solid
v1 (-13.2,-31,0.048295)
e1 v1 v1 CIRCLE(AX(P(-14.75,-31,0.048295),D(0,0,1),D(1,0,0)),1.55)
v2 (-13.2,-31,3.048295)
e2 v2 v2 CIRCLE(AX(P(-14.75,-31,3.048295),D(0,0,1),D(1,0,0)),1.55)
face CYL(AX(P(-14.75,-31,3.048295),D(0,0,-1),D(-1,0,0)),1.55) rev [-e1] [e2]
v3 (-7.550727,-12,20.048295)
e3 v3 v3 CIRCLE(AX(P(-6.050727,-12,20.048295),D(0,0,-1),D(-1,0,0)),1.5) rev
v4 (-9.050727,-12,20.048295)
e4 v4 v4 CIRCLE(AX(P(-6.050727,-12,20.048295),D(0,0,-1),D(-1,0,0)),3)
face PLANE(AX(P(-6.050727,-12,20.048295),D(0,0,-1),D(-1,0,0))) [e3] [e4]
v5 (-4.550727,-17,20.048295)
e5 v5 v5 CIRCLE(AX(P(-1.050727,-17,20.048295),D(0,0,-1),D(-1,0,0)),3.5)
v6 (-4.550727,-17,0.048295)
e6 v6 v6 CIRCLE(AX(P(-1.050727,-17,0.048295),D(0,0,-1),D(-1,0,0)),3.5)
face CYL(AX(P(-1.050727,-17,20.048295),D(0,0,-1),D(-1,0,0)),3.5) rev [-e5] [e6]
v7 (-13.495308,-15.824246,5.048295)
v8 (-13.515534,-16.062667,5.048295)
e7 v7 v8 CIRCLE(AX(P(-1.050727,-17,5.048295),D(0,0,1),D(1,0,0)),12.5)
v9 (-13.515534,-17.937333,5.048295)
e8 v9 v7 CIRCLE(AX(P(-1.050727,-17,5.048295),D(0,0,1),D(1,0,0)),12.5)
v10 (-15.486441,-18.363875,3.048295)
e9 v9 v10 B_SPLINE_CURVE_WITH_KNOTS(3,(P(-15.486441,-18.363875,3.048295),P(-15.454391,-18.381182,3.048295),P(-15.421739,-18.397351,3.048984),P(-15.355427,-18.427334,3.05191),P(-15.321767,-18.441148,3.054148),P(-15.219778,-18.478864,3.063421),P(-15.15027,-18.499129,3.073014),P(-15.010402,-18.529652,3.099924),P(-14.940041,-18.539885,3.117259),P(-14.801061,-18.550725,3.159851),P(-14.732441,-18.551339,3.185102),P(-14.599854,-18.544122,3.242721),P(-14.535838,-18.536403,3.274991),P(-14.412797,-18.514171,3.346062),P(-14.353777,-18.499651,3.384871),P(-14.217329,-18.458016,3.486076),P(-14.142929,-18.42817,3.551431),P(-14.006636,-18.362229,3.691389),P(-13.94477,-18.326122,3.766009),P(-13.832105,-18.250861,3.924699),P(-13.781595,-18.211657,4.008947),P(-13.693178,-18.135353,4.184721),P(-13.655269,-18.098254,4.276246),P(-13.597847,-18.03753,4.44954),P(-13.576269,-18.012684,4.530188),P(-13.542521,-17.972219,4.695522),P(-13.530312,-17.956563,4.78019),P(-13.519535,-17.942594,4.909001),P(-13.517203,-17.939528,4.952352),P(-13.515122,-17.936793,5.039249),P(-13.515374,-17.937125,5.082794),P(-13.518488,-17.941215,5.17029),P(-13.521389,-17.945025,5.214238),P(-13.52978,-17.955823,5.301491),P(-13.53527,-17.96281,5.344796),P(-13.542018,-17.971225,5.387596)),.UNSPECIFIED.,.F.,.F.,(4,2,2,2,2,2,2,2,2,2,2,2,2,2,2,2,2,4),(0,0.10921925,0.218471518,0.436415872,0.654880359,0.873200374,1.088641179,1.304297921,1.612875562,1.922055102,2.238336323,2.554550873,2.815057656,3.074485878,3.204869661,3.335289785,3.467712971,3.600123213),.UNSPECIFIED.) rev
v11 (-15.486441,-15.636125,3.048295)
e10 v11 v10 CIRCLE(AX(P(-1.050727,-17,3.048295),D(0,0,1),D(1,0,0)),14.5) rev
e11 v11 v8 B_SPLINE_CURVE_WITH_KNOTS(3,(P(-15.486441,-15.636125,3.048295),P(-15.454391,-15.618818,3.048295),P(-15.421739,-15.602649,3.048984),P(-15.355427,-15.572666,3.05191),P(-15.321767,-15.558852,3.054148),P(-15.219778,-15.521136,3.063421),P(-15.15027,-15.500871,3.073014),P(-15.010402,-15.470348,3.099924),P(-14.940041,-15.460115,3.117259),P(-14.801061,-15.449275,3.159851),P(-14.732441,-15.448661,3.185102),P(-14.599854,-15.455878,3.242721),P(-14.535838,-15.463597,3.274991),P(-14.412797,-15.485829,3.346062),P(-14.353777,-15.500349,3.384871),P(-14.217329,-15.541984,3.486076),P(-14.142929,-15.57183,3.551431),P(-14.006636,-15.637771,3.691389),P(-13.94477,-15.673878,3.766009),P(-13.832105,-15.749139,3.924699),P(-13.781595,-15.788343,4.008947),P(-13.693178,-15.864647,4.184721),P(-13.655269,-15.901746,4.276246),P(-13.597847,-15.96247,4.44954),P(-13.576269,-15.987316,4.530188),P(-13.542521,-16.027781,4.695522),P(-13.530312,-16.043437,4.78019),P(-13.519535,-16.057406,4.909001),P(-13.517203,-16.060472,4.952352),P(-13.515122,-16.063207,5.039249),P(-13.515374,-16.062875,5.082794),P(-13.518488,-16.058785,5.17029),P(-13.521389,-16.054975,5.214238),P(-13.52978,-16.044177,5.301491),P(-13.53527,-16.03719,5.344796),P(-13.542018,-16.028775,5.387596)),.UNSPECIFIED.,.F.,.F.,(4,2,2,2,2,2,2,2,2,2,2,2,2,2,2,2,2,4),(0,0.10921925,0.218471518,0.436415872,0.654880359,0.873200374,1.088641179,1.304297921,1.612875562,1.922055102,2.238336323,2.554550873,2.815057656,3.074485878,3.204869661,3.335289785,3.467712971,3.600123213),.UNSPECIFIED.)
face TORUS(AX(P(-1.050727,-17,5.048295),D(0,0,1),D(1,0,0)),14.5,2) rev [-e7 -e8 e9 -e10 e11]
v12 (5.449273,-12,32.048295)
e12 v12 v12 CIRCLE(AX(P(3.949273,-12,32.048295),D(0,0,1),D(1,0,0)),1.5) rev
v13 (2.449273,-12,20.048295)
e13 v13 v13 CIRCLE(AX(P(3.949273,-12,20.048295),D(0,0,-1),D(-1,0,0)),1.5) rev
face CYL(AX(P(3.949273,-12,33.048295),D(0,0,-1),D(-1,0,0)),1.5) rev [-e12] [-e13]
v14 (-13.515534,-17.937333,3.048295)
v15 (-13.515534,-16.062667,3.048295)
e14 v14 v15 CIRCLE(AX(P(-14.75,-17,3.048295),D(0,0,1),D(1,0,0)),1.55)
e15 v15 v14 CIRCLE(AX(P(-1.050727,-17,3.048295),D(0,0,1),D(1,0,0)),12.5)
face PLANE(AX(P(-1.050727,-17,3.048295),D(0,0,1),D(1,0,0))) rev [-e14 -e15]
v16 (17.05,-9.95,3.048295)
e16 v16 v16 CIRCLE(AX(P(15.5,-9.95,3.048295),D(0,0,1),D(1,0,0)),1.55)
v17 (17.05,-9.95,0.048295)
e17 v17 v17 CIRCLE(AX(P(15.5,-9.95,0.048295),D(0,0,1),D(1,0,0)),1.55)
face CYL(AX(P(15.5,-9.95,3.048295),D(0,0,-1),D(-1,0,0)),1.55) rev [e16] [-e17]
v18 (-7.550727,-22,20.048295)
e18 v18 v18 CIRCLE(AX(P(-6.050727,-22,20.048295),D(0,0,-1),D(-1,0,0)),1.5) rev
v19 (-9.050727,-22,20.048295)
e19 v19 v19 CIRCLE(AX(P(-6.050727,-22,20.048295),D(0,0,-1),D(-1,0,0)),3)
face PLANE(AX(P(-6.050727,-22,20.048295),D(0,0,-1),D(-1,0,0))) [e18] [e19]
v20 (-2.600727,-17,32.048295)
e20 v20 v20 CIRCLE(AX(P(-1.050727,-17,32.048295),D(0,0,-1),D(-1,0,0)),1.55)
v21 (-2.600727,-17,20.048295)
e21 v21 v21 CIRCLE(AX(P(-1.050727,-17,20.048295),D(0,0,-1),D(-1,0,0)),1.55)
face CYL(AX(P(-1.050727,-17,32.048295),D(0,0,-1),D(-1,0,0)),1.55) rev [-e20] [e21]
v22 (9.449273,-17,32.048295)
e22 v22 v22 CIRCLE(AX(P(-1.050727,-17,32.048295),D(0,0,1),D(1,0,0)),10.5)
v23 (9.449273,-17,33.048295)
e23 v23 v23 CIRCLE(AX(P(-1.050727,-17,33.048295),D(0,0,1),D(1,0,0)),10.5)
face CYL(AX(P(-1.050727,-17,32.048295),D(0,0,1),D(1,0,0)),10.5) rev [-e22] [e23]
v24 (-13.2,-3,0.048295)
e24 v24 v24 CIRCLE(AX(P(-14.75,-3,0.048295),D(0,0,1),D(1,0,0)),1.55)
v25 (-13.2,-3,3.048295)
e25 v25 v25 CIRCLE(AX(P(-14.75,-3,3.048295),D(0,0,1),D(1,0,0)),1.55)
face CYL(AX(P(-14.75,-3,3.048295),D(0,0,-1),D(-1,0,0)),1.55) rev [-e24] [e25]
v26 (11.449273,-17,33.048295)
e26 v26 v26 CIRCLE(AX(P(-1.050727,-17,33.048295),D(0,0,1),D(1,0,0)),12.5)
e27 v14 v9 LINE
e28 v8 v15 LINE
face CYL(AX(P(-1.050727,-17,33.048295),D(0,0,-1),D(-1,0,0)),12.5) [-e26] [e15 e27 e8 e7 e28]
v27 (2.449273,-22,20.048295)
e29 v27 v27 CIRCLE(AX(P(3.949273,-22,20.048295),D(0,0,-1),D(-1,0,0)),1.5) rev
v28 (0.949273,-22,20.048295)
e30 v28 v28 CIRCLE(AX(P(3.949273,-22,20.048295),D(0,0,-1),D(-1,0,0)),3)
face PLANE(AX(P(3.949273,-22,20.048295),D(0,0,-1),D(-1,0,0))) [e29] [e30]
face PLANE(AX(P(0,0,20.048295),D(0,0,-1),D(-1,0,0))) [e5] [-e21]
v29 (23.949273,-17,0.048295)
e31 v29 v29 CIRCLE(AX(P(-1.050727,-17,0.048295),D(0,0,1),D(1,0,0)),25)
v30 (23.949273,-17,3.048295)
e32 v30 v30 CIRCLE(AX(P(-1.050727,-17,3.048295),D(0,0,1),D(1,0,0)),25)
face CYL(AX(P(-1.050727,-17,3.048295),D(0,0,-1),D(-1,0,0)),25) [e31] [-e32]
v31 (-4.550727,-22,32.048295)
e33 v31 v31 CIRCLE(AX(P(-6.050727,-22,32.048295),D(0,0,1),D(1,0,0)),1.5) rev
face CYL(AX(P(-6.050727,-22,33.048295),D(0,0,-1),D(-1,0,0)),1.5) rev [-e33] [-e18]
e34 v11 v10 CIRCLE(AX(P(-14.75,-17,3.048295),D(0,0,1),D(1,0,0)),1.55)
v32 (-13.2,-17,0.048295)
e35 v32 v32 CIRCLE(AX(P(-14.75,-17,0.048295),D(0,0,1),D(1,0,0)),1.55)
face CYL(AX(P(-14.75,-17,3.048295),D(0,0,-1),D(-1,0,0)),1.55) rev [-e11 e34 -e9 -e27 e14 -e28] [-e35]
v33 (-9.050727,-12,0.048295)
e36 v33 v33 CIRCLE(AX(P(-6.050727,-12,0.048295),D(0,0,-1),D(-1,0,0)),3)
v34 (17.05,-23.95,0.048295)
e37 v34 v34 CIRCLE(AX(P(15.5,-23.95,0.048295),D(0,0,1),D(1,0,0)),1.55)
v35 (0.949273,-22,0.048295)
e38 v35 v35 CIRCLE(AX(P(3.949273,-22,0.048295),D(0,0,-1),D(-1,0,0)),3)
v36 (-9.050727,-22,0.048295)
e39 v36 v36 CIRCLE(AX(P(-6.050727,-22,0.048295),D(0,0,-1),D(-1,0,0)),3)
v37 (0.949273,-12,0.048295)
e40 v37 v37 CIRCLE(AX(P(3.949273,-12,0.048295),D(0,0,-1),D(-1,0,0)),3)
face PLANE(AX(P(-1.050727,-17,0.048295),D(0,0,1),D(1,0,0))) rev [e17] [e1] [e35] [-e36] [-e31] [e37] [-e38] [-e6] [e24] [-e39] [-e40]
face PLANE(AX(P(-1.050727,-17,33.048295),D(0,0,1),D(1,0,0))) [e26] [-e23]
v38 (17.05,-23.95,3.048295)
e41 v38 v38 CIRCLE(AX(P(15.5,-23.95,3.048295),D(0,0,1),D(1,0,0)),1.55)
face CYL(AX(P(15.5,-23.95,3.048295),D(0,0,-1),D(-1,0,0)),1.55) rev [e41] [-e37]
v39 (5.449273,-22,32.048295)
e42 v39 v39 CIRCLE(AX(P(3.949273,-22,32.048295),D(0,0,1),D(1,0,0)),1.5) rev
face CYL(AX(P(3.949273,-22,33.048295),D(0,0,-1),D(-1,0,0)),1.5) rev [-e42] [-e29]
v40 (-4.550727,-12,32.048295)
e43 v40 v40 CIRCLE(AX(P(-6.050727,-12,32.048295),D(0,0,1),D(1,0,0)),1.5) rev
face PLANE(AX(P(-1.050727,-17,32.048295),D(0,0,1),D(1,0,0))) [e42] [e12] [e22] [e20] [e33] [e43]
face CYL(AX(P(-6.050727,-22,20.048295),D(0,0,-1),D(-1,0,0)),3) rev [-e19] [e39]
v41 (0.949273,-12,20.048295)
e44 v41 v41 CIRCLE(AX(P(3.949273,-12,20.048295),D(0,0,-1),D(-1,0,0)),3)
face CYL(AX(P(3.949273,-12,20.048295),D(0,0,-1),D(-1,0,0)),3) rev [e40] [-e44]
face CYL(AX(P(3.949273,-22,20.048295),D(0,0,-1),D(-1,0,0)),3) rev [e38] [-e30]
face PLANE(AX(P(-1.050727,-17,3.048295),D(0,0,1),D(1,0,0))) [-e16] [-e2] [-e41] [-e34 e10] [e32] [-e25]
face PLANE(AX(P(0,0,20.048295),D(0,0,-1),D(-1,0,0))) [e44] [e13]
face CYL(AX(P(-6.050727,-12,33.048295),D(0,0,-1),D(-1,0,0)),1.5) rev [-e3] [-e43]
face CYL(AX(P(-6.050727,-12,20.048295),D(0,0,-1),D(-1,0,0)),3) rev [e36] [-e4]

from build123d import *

# Parameters (mm, degrees)
SKETCH_2_R          = 25
SKETCH_2_R_2        = 1.55
EXTRUDE_1_DEPTH     = 3
SKETCH_3_R          = 12.5
EXTRUDE_2_DEPTH     = 30
SKETCH_4_R          = 4
CUT_EXTRUDE_1_DEPTH = 18
SKETCH_5_R          = 2.467025672
SKETCH_5_R_2        = 1.5
CUT_EXTRUDE_2_DEPTH = 33
SKETCH_6_R          = 10.5
CUT_EXTRUDE_3_DEPTH = 1
FILLET_1_R          = 2
SKETCH_8_R          = 9.571067812
EXTRUDE_4_DEPTH     = 18
SKETCH_9_R          = 3.5
SKETCH_9_R_2        = 3
CUT_EXTRUDE_7_DEPTH = 20
SKETCH_10_R         = 2.467025672
SKETCH_10_R_2       = 1.55
EXTRUDE_5_DEPTH     = 12


with BuildPart() as part:
    # 草图2 → 凸台-拉伸1 (new body)
    with BuildSketch(Plane.XY.offset(0.048295154)):
        with Locations((-1.050726952, -17)):
            Circle(SKETCH_2_R)
        with Locations((-14.75, -3)):
            Circle(SKETCH_2_R_2, mode=Mode.SUBTRACT)
        with Locations((-14.75, -17)):
            Circle(SKETCH_2_R_2, mode=Mode.SUBTRACT)
        with Locations((-14.75, -31)):
            Circle(SKETCH_2_R_2, mode=Mode.SUBTRACT)
        with Locations((15.5, -23.95)):
            Circle(SKETCH_2_R_2, mode=Mode.SUBTRACT)
        with Locations((15.5, -9.95)):
            Circle(SKETCH_2_R_2, mode=Mode.SUBTRACT)
    extrude(amount=EXTRUDE_1_DEPTH)

    # 草图3 → 凸台-拉伸2 (add)
    with BuildSketch(Plane.XY.offset(3.048295154)):
        with Locations(Location((-1.050726952, -17, 0), (0, 0, 184.300454135))):
            Circle(SKETCH_3_R)
    extrude(amount=EXTRUDE_2_DEPTH)

    # 草图4 → 切除-拉伸1 (cut)
    with BuildSketch(Plane(origin=(0, 0, 0.048295154), x_dir=(-1, 0, 0), z_dir=(0, 0, -1))):
        with BuildLine():
            ThreePointArc((8.550726952, -12), (6.050726952, -9.5), (3.550726952, -12))
            Line((3.550726952, -12), (6.050726952, -12))
            Line((6.050726952, -12), (6.050726952, -14.5))
            ThreePointArc((6.050726952, -14.5), (7.818493905, -13.767766953), (8.550726952, -12))
        make_face()
        with BuildLine():
            Line((6.050726952, -12), (3.550726952, -12))
            ThreePointArc((3.550726952, -12), (4.282959999, -13.767766953), (6.050726952, -14.5))
            Line((6.050726952, -14.5), (6.050726952, -12))
        make_face()
        with BuildLine():
            ThreePointArc((8.550726952, -22), (7.818493905, -20.232233047), (6.050726952, -19.5))
            Line((6.050726952, -19.5), (6.050726952, -22))
            Line((6.050726952, -22), (3.550726952, -22))
            ThreePointArc((3.550726952, -22), (6.050726952, -24.5), (8.550726952, -22))
        make_face()
        with BuildLine():
            Line((6.050726952, -22), (6.050726952, -19.5))
            ThreePointArc((6.050726952, -19.5), (4.282959999, -20.232233047), (3.550726952, -22))
            Line((3.550726952, -22), (6.050726952, -22))
        make_face()
        with BuildLine():
            ThreePointArc((-1.449273048, -22), (-2.181506095, -20.232233047), (-3.949273048, -19.5))
            Line((-3.949273048, -19.5), (-3.949273048, -22))
            Line((-3.949273048, -22), (-1.449273048, -22))
        make_face()
        with BuildLine():
            Line((-3.949273048, -22), (-3.949273048, -19.5))
            ThreePointArc((-3.949273048, -19.5), (-5.717040001, -23.767766953), (-1.449273048, -22))
            Line((-1.449273048, -22), (-3.949273048, -22))
        make_face()
        with BuildLine():
            Line((-3.949273048, -14.5), (-3.949273048, -12))
            Line((-3.949273048, -12), (-1.449273048, -12))
            ThreePointArc((-1.449273048, -12), (-5.717040001, -10.232233047), (-3.949273048, -14.5))
        make_face()
        with BuildLine():
            Line((-1.449273048, -12), (-3.949273048, -12))
            Line((-3.949273048, -12), (-3.949273048, -14.5))
            ThreePointArc((-3.949273048, -14.5), (-2.181506095, -13.767766953), (-1.449273048, -12))
        make_face()
        with Locations((1.050726952, -17)):
            Circle(SKETCH_4_R)
    extrude(amount=-CUT_EXTRUDE_1_DEPTH, mode=Mode.SUBTRACT)

    # 草图5 → 切除-拉伸2 (cut)
    with BuildSketch(Plane(origin=(0, 0, 0.048295154), x_dir=(-1, 0, 0), z_dir=(0, 0, -1))):
        with Locations((1.050726952, -17)):
            Circle(SKETCH_5_R)
        with Locations((6.050726952, -12)):
            Circle(SKETCH_5_R_2)
        with Locations((-3.949273048, -12)):
            Circle(SKETCH_5_R_2)
        with Locations((-3.949273048, -22)):
            Circle(SKETCH_5_R_2)
        with Locations((6.050726952, -22)):
            Circle(SKETCH_5_R_2)
    extrude(amount=-CUT_EXTRUDE_2_DEPTH, mode=Mode.SUBTRACT)

    # 草图6 → 切除-拉伸3 (cut)
    with BuildSketch(Plane.XY.offset(33.048295154)):
        with Locations((-1.050726952, -17)):
            Circle(SKETCH_6_R)
    extrude(amount=-CUT_EXTRUDE_3_DEPTH, mode=Mode.SUBTRACT)

    # 圆角1
    # the kernel refuses this fillet: 2 mm, written as the material it adds along each edge
    with BuildSketch(Plane(origin=(-1.050726952, -17, 3.048295154), x_dir=(-0.9999950652018734, -0.0031415874810074846, 0), z_dir=(-0.0031415874810074846, 0.9999950652018734, 0))) as fillet_1_piece_1_section:
        with BuildLine():
            CenterArc((12.5 + FILLET_1_R, FILLET_1_R), FILLET_1_R, 180, 90)
            Line((12.5, FILLET_1_R), (12.5, 0))
            Line((12.5, 0), (12.5 + FILLET_1_R, 0))
        make_face()
    fillet_1_piece_1 = revolve(axis=Axis((-1.050726952, -17, 3.048295154), (0, 0, 1)), revolution_arc=359.64, mode=Mode.PRIVATE)
    fillet_1_piece_1 = fillet_1_piece_1 - Plane(origin=(-14.75, -17, 3.605266613), x_dir=(1, 0, 0), z_dir=(0, 0, -1)) * Cylinder(1.55, 59, mode=Mode.PRIVATE)
    add(fillet_1_piece_1)

    # 草图8 → 凸台-拉伸4 (add)
    with BuildSketch(Plane(origin=(0, 0, 0.048295154), x_dir=(-1, 0, 0), z_dir=(0, 0, -1))):
        with Locations((1.050726952, -17)):
            Circle(SKETCH_8_R)
    extrude(amount=-EXTRUDE_4_DEPTH)

    # 草图9 → 切除-拉伸7 (cut)
    with BuildSketch(Plane(origin=(0, 0, 0.048295154), x_dir=(-1, 0, 0), z_dir=(0, 0, -1))):
        with BuildLine():
            ThreePointArc((-0.949273048, -12), (-6.070593392, -9.878679656), (-3.949273048, -15))
            Line((-3.949273048, -15), (-3.949273048, -12))
            Line((-3.949273048, -12), (-0.949273048, -12))
        make_face()
        with BuildLine():
            Line((-3.949273048, -12), (-3.949273048, -15))
            ThreePointArc((-3.949273048, -15), (-1.827952704, -14.121320344), (-0.949273048, -12))
            Line((-0.949273048, -12), (-3.949273048, -12))
        make_face()
        with Locations((1.050726952, -17)):
            Circle(SKETCH_9_R)
        with Locations((6.050726952, -12)):
            Circle(SKETCH_9_R_2)
        with Locations((6.050726952, -22)):
            Circle(SKETCH_9_R_2)
        with Locations((-3.949273048, -22)):
            Circle(SKETCH_9_R_2)
    extrude(amount=-CUT_EXTRUDE_7_DEPTH, mode=Mode.SUBTRACT)

    # 草图10 → 凸台-拉伸5 (add)
    with BuildSketch(Plane(origin=(0, 0, 20.048295154), x_dir=(-1, 0, 0), z_dir=(0, 0, -1))):
        with Locations((1.050726952, -17)):
            Circle(SKETCH_10_R)
        with Locations((1.050726952, -17)):
            Circle(SKETCH_10_R_2, mode=Mode.SUBTRACT)
    extrude(amount=-EXTRUDE_5_DEPTH)


solid = part.part
